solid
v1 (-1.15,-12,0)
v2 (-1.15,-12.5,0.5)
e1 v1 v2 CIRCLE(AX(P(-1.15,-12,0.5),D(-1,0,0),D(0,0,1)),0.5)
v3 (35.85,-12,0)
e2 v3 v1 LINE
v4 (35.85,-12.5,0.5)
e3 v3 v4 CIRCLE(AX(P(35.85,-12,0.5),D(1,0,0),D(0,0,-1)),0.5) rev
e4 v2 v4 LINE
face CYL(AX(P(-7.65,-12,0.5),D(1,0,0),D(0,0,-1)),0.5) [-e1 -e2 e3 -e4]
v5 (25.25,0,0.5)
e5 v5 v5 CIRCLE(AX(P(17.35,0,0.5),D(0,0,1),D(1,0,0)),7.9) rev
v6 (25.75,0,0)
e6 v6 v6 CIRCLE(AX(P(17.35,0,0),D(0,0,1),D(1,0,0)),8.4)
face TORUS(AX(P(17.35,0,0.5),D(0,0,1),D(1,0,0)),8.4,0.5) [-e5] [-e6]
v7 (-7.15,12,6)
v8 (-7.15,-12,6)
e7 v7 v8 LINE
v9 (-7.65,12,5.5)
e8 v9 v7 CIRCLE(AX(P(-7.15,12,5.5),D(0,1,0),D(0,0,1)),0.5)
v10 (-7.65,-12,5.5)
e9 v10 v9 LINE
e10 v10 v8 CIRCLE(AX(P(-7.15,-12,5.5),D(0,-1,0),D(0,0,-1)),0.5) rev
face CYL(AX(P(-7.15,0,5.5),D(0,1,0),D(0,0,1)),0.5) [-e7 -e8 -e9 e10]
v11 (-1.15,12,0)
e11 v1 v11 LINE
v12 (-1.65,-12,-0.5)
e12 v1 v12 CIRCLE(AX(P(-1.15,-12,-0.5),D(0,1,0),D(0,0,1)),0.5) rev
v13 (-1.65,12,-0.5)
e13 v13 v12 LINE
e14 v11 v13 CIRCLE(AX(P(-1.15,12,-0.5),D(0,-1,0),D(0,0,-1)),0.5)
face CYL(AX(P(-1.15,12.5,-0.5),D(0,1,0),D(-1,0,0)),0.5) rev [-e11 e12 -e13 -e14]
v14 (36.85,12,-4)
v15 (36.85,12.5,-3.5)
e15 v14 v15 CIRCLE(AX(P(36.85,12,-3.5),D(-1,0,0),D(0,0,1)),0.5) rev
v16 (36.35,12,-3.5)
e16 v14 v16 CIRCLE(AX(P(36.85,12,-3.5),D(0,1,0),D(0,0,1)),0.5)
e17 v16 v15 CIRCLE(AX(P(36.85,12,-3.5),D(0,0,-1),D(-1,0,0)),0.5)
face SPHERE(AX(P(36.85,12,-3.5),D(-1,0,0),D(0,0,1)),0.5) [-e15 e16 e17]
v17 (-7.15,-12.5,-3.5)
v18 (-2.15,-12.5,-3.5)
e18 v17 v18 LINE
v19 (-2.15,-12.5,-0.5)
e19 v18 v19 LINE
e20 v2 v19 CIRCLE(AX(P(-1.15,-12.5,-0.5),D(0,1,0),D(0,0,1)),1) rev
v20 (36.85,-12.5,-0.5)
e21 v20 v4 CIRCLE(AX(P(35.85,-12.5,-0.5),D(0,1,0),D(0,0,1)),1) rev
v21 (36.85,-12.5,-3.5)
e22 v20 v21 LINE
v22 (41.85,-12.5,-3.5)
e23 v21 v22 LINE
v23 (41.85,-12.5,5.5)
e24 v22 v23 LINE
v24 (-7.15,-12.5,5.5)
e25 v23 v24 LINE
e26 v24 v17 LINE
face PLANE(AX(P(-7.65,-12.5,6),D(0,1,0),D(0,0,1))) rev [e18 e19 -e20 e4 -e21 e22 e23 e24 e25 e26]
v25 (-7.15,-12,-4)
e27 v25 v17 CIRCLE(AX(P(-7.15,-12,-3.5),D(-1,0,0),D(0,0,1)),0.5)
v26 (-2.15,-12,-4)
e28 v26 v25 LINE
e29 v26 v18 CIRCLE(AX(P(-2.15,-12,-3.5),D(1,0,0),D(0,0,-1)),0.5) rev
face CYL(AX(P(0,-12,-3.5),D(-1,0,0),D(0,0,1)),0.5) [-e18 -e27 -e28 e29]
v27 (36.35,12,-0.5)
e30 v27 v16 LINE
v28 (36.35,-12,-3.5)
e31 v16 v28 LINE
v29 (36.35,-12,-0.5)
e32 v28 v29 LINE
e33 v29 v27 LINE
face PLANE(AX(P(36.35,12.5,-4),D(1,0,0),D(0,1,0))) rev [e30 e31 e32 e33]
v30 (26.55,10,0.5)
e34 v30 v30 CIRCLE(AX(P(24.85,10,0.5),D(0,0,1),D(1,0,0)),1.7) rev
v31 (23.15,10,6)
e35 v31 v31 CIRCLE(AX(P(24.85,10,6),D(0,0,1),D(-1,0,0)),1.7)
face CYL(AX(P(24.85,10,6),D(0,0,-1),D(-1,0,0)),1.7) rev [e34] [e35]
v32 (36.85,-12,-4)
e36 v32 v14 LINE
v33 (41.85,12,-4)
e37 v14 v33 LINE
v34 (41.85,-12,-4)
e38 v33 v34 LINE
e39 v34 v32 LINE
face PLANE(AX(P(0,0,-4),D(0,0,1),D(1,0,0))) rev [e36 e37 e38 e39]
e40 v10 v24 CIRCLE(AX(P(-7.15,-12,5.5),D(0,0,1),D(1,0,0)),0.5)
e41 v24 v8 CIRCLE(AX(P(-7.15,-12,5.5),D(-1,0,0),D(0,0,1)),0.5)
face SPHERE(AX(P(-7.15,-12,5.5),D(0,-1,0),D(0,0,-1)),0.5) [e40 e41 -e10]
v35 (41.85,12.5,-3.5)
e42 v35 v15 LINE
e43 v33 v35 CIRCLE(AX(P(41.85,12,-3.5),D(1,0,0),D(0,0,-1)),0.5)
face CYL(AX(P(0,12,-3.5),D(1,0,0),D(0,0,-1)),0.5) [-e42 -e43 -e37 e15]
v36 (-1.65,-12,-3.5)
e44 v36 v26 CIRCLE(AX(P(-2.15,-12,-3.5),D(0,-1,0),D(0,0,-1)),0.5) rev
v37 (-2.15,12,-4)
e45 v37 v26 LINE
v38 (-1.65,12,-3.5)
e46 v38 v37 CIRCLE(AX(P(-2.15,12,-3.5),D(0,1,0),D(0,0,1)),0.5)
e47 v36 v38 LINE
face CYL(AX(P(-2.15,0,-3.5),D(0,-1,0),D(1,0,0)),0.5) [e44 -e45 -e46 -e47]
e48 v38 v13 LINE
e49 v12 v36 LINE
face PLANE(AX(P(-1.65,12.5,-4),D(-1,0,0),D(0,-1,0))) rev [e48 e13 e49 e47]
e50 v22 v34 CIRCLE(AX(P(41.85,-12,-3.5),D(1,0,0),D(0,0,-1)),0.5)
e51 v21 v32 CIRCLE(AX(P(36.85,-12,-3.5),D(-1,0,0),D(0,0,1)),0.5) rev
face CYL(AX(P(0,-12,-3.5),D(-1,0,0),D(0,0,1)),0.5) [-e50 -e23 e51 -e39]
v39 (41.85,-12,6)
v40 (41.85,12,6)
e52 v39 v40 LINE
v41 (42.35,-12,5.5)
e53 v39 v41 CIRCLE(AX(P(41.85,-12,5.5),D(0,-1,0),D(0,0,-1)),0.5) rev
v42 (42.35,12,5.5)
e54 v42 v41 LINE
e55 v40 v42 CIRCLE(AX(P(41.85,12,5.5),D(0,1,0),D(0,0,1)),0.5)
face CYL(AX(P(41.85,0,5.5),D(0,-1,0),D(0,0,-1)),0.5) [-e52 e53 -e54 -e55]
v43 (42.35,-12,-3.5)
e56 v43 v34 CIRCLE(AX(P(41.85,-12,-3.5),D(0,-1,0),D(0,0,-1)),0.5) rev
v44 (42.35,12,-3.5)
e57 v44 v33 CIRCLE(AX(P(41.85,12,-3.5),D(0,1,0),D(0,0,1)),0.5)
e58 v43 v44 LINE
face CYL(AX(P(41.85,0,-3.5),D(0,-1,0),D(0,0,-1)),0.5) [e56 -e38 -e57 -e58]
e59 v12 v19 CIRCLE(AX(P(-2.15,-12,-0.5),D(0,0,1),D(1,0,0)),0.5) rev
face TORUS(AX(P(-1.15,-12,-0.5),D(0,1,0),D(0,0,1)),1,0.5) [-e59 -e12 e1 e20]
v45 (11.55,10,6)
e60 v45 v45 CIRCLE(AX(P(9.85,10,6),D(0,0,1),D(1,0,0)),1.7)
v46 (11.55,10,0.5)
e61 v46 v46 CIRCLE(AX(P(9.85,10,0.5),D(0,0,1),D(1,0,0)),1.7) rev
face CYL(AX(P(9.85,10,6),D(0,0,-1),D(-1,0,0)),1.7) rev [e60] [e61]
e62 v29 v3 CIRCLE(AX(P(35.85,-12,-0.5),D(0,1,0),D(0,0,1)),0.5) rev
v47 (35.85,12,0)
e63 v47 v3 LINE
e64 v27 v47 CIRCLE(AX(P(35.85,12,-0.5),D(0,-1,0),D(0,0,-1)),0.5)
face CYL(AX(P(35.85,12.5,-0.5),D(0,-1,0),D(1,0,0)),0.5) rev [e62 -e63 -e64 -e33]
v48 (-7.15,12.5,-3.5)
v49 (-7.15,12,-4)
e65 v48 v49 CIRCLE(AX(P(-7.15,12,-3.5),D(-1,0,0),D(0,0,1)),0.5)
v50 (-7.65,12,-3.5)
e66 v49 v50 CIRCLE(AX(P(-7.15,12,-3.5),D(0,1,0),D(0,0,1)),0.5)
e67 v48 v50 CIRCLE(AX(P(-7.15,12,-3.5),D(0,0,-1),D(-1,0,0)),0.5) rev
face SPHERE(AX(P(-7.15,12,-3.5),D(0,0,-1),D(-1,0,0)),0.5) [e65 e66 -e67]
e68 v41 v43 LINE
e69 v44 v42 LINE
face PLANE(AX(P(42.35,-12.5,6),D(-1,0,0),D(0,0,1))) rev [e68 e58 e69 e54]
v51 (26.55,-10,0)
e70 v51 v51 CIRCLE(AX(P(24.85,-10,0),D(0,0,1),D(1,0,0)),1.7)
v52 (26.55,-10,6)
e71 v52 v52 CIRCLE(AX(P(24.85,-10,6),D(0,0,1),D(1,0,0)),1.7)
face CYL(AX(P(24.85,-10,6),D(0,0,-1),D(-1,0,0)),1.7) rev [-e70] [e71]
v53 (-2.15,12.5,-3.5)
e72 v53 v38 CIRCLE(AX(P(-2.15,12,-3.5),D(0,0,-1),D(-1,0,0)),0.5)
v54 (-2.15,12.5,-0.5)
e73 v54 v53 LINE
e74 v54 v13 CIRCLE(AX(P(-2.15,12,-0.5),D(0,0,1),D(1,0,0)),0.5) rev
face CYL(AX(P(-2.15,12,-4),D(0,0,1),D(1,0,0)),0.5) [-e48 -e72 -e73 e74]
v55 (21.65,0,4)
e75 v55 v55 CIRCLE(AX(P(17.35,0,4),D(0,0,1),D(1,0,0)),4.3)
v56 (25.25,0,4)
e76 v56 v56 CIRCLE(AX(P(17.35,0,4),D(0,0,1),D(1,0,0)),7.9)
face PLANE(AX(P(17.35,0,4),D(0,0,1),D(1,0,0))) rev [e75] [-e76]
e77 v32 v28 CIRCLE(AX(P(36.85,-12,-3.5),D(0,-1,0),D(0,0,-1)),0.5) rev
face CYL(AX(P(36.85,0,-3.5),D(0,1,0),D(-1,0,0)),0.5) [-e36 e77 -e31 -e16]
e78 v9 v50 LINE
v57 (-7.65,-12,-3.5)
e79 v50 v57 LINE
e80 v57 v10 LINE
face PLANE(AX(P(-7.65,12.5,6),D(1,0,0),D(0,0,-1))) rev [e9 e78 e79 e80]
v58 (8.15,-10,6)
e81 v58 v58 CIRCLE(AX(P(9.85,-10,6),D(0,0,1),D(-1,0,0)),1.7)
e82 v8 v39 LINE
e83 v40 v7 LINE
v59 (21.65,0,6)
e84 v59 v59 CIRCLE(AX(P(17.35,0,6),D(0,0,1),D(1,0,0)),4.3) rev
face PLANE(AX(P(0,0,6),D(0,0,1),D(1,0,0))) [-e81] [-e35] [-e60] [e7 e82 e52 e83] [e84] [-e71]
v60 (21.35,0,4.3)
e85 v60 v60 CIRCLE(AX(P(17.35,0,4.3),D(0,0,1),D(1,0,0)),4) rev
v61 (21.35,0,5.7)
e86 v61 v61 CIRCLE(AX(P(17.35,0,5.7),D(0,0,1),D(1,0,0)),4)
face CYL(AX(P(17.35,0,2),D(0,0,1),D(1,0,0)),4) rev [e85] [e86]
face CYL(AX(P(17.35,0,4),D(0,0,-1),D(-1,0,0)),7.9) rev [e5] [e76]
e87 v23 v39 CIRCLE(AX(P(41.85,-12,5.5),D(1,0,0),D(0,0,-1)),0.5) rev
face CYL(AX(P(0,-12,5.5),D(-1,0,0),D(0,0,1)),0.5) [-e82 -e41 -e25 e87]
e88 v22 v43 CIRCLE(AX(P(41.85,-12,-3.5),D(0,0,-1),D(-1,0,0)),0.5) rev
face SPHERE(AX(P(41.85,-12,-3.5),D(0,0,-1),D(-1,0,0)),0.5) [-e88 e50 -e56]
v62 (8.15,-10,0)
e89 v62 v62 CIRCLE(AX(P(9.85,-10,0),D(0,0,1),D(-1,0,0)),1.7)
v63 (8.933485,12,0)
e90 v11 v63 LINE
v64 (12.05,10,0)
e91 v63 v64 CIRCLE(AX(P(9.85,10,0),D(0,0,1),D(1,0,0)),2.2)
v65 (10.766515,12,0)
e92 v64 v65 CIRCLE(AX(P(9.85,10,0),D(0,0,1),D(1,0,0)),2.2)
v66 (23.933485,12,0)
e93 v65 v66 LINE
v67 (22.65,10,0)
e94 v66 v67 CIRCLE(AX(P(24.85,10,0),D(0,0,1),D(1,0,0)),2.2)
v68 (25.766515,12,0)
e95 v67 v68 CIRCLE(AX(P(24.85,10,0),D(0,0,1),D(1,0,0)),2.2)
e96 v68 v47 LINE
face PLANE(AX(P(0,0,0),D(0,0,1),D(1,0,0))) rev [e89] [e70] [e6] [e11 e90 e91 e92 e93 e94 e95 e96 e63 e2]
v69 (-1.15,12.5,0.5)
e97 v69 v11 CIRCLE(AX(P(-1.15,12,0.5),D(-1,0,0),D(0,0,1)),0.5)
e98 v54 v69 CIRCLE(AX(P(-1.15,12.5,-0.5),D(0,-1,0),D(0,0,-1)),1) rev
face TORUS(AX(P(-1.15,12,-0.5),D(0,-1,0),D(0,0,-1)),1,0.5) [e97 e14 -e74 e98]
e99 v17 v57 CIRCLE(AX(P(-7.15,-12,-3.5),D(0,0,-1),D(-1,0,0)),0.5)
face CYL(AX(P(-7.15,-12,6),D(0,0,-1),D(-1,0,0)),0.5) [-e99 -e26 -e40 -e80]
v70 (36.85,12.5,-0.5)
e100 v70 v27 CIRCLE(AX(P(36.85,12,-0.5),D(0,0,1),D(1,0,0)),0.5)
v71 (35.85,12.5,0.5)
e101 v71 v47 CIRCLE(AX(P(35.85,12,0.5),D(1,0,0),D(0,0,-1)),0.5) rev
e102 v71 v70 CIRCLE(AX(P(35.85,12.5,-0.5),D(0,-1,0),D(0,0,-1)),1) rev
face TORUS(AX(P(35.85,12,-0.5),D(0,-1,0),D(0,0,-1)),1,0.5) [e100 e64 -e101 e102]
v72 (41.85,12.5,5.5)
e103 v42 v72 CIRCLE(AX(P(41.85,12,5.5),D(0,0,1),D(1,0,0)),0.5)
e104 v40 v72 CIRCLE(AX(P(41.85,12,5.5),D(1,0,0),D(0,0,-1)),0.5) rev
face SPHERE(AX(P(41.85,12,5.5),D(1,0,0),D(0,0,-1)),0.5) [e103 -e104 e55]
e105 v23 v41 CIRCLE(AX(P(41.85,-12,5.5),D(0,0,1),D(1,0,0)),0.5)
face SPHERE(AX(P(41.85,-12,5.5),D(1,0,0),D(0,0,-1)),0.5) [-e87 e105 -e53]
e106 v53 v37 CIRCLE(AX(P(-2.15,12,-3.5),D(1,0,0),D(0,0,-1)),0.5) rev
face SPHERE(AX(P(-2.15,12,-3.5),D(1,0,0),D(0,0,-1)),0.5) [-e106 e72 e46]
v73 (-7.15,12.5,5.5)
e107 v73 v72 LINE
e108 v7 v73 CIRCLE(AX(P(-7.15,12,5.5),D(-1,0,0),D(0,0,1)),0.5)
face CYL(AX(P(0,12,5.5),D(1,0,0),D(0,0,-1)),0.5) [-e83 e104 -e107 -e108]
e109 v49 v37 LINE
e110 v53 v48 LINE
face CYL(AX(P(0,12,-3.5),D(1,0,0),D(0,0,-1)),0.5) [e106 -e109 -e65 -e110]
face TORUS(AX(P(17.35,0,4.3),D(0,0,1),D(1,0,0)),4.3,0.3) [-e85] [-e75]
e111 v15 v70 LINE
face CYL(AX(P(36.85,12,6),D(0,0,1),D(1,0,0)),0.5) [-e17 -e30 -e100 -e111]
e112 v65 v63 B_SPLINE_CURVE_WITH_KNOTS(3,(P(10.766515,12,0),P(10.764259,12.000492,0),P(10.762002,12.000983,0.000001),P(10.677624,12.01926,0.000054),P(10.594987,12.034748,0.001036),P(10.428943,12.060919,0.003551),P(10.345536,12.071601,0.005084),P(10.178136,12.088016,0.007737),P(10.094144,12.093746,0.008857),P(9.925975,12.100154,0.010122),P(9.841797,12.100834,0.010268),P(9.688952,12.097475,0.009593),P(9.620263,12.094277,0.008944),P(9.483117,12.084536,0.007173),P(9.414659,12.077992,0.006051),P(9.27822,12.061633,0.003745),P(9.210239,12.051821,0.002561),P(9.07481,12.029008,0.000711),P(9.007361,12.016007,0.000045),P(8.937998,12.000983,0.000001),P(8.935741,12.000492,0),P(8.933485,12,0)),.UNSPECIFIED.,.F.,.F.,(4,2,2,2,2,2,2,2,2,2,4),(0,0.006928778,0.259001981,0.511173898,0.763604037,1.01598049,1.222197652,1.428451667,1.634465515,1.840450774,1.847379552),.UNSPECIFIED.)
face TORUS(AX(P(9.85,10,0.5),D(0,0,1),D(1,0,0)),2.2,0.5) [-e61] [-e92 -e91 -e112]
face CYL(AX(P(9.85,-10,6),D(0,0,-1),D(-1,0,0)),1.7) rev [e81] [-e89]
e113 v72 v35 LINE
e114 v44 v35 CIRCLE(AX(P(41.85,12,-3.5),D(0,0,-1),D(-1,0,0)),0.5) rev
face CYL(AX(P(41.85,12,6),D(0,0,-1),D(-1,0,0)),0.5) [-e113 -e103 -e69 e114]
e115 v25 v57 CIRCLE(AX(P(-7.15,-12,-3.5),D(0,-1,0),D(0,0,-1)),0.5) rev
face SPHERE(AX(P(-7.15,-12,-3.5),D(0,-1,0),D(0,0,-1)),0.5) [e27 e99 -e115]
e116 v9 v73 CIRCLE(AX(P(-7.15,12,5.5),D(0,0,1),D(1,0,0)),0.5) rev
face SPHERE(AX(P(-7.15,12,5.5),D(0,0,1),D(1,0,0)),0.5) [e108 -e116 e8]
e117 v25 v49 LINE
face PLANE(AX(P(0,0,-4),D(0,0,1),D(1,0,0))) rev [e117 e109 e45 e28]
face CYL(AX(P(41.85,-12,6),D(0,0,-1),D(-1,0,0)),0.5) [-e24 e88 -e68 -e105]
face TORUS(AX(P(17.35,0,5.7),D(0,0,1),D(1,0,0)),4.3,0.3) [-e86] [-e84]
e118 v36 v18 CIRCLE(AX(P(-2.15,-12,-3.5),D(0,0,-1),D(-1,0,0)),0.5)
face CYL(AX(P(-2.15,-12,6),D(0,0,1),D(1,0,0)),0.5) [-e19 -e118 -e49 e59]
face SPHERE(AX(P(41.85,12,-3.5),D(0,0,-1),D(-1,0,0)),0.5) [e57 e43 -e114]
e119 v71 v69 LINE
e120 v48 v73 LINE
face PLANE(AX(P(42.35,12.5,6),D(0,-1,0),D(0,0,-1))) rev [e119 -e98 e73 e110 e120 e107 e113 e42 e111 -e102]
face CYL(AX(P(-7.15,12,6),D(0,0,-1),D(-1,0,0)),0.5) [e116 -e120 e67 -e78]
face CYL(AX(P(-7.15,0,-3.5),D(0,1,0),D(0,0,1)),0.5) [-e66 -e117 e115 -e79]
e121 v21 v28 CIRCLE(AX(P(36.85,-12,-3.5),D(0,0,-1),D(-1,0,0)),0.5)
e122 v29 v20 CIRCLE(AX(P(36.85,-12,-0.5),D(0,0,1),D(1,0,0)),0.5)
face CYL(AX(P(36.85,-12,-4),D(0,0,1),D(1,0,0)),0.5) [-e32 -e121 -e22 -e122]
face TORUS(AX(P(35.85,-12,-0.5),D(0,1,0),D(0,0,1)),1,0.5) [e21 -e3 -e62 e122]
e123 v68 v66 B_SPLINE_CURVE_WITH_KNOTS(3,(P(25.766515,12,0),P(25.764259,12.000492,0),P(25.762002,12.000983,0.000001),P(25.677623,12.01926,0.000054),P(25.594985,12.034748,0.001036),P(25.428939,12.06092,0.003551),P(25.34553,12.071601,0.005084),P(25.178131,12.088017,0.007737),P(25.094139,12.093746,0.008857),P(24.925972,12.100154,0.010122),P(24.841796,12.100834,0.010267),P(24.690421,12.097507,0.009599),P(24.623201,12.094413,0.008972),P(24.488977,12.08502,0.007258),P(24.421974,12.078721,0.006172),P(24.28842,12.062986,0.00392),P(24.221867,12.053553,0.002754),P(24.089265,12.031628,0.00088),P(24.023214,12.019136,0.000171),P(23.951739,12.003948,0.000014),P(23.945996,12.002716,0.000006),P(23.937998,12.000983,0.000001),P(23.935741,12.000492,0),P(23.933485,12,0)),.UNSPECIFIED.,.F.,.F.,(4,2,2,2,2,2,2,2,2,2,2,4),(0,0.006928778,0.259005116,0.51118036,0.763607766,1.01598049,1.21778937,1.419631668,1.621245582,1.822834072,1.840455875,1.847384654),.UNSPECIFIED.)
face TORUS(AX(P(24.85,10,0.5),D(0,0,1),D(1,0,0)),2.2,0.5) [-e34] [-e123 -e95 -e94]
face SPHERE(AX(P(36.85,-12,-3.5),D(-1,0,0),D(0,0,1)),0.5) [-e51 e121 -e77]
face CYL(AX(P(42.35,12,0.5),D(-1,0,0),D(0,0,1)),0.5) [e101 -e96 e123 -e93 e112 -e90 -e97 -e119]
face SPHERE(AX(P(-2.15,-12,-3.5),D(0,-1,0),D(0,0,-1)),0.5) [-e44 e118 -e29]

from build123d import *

# Parameters (mm, degrees)
SKETCH1_W               = 50
SKETCH1_H               = 25
SKETCH1_R               = 1.7
BOSS_EXTRUDE1_DEPTH     = 6
SKETCH2_R               = 4
CUT_EXTRUDE1_DEPTH      = 4
CUT_EXTRUDE2_DEPTH      = 2
CUT_EXTRUDE2_DEPTH_BACK = 45.337033054
SKETCH3_R               = 7.9
SKETCH5_W               = 6
SKETCH5_H               = 25
BOSS_EXTRUDE3_DEPTH     = 4
FILLET1_R               = 0.5
FILLET2_R               = 0.5
FILLET3_R               = 0.3


with BuildPart() as part:
    # Sketch1 → Boss-Extrude1 (new body)
    with BuildSketch(Plane.XY):
        with Locations((17.35, 0)):
            Rectangle(SKETCH1_W, SKETCH1_H)
        with Locations((9.85, 10)):
            Circle(SKETCH1_R, mode=Mode.SUBTRACT)
        with Locations(Location((24.85, 10, 0), (0, 0, 180))):
            Circle(SKETCH1_R, mode=Mode.SUBTRACT)
        with Locations((24.85, -10)):
            Circle(SKETCH1_R, mode=Mode.SUBTRACT)
        with Locations(Location((9.85, -10, 0), (0, 0, 180))):
            Circle(SKETCH1_R, mode=Mode.SUBTRACT)
    extrude(amount=BOSS_EXTRUDE1_DEPTH)

    # Sketch2 → Cut-Extrude1 (cut)
    with BuildSketch(Plane.XY.offset(6)):
        with Locations((17.35, 0)):
            Circle(SKETCH2_R)
    extrude(amount=-CUT_EXTRUDE1_DEPTH, mode=Mode.SUBTRACT)

    # Sketch3 → Cut-Extrude2 (cut, two sides: drawn at the far end of the back side and taken through both)
    with BuildSketch(Plane.XY.offset(2).offset(-CUT_EXTRUDE2_DEPTH_BACK)):
        with Locations((17.35, 0)):
            Circle(SKETCH3_R)
    extrude(amount=CUT_EXTRUDE2_DEPTH + CUT_EXTRUDE2_DEPTH_BACK, mode=Mode.SUBTRACT)

    # Sketch5 → Boss-Extrude3 (add)
    with BuildSketch(Plane(origin=(0, 0, 0), x_dir=(-1, 0, 0), z_dir=(0, 0, -1))):
        with Locations((4.65, 0)):
            Rectangle(SKETCH5_W, SKETCH5_H)
        with Locations((-39.35, 0)):
            Rectangle(SKETCH5_W, SKETCH5_H)
    extrude(amount=BOSS_EXTRUDE3_DEPTH)

    # Fillet1
    # the kernel refuses this fillet: 0.5 mm, written as the material it adds along each edge
    with BuildSketch(Plane(origin=(-1.65, 12.5, 0), x_dir=(0, 0, -1), z_dir=(0, -1, 0)), Plane(origin=(36.35, 12.5, 0), x_dir=(-1, 0, 0), z_dir=(0, -1, 0))) as fillet1_piece_1:
        with BuildLine():
            CenterArc((FILLET1_R, FILLET1_R), FILLET1_R, 180, 90)
            Line((0, FILLET1_R), (0, 0))
            Line((0, 0), (FILLET1_R, 0))
        make_face()
    extrude(amount=25)
    # the kernel refuses this fillet: 0.5 mm, written as the material it takes off along each edge
    with BuildSketch(Plane(origin=(-7.15, -12, 5.5), x_dir=(0, 0, 1), z_dir=(-1, 0, 0))) as fillet1_2_piece_1_section:
        Polygon((0, 0), (FILLET1_R, 0), (FILLET1_R, -FILLET1_R), (0, -FILLET1_R), align=None)
    fillet1_2_piece_1 = extrude(amount=FILLET1_R, mode=Mode.PRIVATE)
    fillet1_2_piece_1 = fillet1_2_piece_1 - Plane(origin=(-7.15, -12, 5.5), x_dir=(0, 0.7071067811865475, -0.7071067811865475), z_dir=(-1, 0, 0)) * Sphere(FILLET1_R, mode=Mode.PRIVATE)
    add(fillet1_2_piece_1, mode=Mode.SUBTRACT)
    with BuildSketch(Plane(origin=(41.85, -12, 5.5), x_dir=(0, -1, 0), z_dir=(0, 0, 1))) as fillet1_2_piece_2_section:
        Polygon((0, 0), (FILLET1_R, 0), (FILLET1_R, FILLET1_R), (0, FILLET1_R), align=None)
    fillet1_2_piece_2 = extrude(amount=FILLET1_R, mode=Mode.PRIVATE)
    fillet1_2_piece_2 = fillet1_2_piece_2 - Plane(origin=(41.85, -12, 5.5), x_dir=(-0.7071067811865475, 0.7071067811865475, 0), z_dir=(0, 0, 1)) * Sphere(FILLET1_R, mode=Mode.PRIVATE)
    add(fillet1_2_piece_2, mode=Mode.SUBTRACT)
    with BuildSketch(Plane(origin=(41.85, 12, 5.5), x_dir=(0, 0, 1), z_dir=(0, 1, 0))) as fillet1_2_piece_3_section:
        Polygon((0, 0), (FILLET1_R, 0), (FILLET1_R, FILLET1_R), (0, FILLET1_R), align=None)
    fillet1_2_piece_3 = extrude(amount=FILLET1_R, mode=Mode.PRIVATE)
    fillet1_2_piece_3 = fillet1_2_piece_3 - Plane(origin=(41.85, 12, 5.5), x_dir=(-0.7071067811865475, 0, -0.7071067811865475), z_dir=(0, 1, 0)) * Sphere(FILLET1_R, mode=Mode.PRIVATE)
    add(fillet1_2_piece_3, mode=Mode.SUBTRACT)
    with BuildSketch(Plane(origin=(-7.15, -12, -3.5), x_dir=(0, -1, 0), z_dir=(-1, 0, 0))) as fillet1_2_piece_4_section:
        Polygon((0, 0), (FILLET1_R, 0), (FILLET1_R, -FILLET1_R), (0, -FILLET1_R), align=None)
    fillet1_2_piece_4 = extrude(amount=FILLET1_R, mode=Mode.PRIVATE)
    fillet1_2_piece_4 = fillet1_2_piece_4 - Plane(origin=(-7.15, -12, -3.5), x_dir=(0, 0.7071067811865475, 0.7071067811865475), z_dir=(-1, 0, 0)) * Sphere(FILLET1_R, mode=Mode.PRIVATE)
    add(fillet1_2_piece_4, mode=Mode.SUBTRACT)
    with BuildSketch(Plane(origin=(-7.15, 12, -3.5), x_dir=(0, 1, 0), z_dir=(-1, 0, 0))) as fillet1_2_piece_5_section:
        Polygon((0, 0), (FILLET1_R, 0), (FILLET1_R, FILLET1_R), (0, FILLET1_R), align=None)
    fillet1_2_piece_5 = extrude(amount=FILLET1_R, mode=Mode.PRIVATE)
    fillet1_2_piece_5 = fillet1_2_piece_5 - Plane(origin=(-7.15, 12, -3.5), x_dir=(0, -0.7071067811865475, 0.7071067811865475), z_dir=(-1, 0, 0)) * Sphere(FILLET1_R, mode=Mode.PRIVATE)
    add(fillet1_2_piece_5, mode=Mode.SUBTRACT)
    with BuildSketch(Plane(origin=(-7.15, 12, 5.5), x_dir=(0, 1, 0), z_dir=(-1, 0, 0))) as fillet1_2_piece_6_section:
        Polygon((0, 0), (FILLET1_R, 0), (FILLET1_R, -FILLET1_R), (0, -FILLET1_R), align=None)
    fillet1_2_piece_6 = extrude(amount=FILLET1_R, mode=Mode.PRIVATE)
    fillet1_2_piece_6 = fillet1_2_piece_6 - Plane(origin=(-7.15, 12, 5.5), x_dir=(0, -0.7071067811865475, -0.7071067811865475), z_dir=(-1, 0, 0)) * Sphere(FILLET1_R, mode=Mode.PRIVATE)
    add(fillet1_2_piece_6, mode=Mode.SUBTRACT)
    with BuildSketch(Plane(origin=(41.85, 12, -3.5), x_dir=(1, 0, 0), z_dir=(0, 1, 0))) as fillet1_2_piece_7_section:
        Polygon((0, 0), (FILLET1_R, 0), (FILLET1_R, FILLET1_R), (0, FILLET1_R), align=None)
    fillet1_2_piece_7 = extrude(amount=FILLET1_R, mode=Mode.PRIVATE)
    fillet1_2_piece_7 = fillet1_2_piece_7 - Plane(origin=(41.85, 12, -3.5), x_dir=(-0.7071067811865475, 0, 0.7071067811865475), z_dir=(0, 1, 0)) * Sphere(FILLET1_R, mode=Mode.PRIVATE)
    add(fillet1_2_piece_7, mode=Mode.SUBTRACT)
    with BuildSketch(Plane(origin=(41.85, -12, -3.5), x_dir=(0, -1, 0), z_dir=(0, 0, -1))) as fillet1_2_piece_8_section:
        Polygon((0, 0), (FILLET1_R, 0), (FILLET1_R, -FILLET1_R), (0, -FILLET1_R), align=None)
    fillet1_2_piece_8 = extrude(amount=FILLET1_R, mode=Mode.PRIVATE)
    fillet1_2_piece_8 = fillet1_2_piece_8 - Plane(origin=(41.85, -12, -3.5), x_dir=(-0.7071067811865475, 0.7071067811865475, 0), z_dir=(0, 0, -1)) * Sphere(FILLET1_R, mode=Mode.PRIVATE)
    add(fillet1_2_piece_8, mode=Mode.SUBTRACT)
    with BuildSketch(Plane(origin=(9.85, 10, 0), x_dir=(1, 0, 0), z_dir=(0, -1, 0))) as fillet1_2_piece_9:
        with BuildLine():
            CenterArc((1.7 + FILLET1_R, FILLET1_R), FILLET1_R, 180, 90)
            Line((1.7, FILLET1_R), (1.7, 0))
            Line((1.7, 0), (1.7 + FILLET1_R, 0))
        make_face()
    revolve(axis=Axis((9.85, 10, 0), (0, 0, 1)), mode=Mode.SUBTRACT)
    with BuildSketch(Plane(origin=(-7.15, -12.5, 6), x_dir=(0, 1, 0), z_dir=(1, 0, 0))) as fillet1_2_piece_10:
        with BuildLine():
            CenterArc((FILLET1_R, -FILLET1_R), FILLET1_R, 90, 90)
            Line((0, -FILLET1_R), (0, 0))
            Line((0, 0), (FILLET1_R, 0))
        make_face()
    extrude(amount=49, mode=Mode.SUBTRACT)
    with BuildSketch(Plane(origin=(24.85, 10, 0), x_dir=(-1, 0, 0), z_dir=(0, 1, 0))) as fillet1_2_piece_11:
        with BuildLine():
            CenterArc((1.7 + FILLET1_R, FILLET1_R), FILLET1_R, 180, 90)
            Line((1.7, FILLET1_R), (1.7, 0))
            Line((1.7, 0), (1.7 + FILLET1_R, 0))
        make_face()
    revolve(axis=Axis((24.85, 10, 0), (0, 0, 1)), mode=Mode.SUBTRACT)
    with BuildSketch(Plane(origin=(42.35, -12, 6), x_dir=(-1, 0, 0), z_dir=(0, 1, 0)), Plane(origin=(42.35, -12, -4), x_dir=(0, 0, 1), z_dir=(0, 1, 0))) as fillet1_2_piece_12:
        with BuildLine():
            CenterArc((FILLET1_R, -FILLET1_R), FILLET1_R, 90, 90)
            Line((0, -FILLET1_R), (0, 0))
            Line((0, 0), (FILLET1_R, 0))
        make_face()
    extrude(amount=24, mode=Mode.SUBTRACT)
    with BuildSketch(Plane(origin=(-7.65, -12, -4), x_dir=(0, 0, 1), z_dir=(0, 1, 0)), Plane(origin=(-7.65, 12, 6), x_dir=(0, 0, -1), z_dir=(0, -1, 0))) as fillet1_2_piece_13:
        with BuildLine():
            CenterArc((FILLET1_R, FILLET1_R), FILLET1_R, 180, 90)
            Line((0, FILLET1_R), (0, 0))
            Line((0, 0), (FILLET1_R, 0))
        make_face()
    extrude(amount=24, mode=Mode.SUBTRACT)
    with BuildSketch(Plane(origin=(-7.15, 12.5, -4), x_dir=(0, 0, 1), z_dir=(1, 0, 0)), Plane(origin=(-0.4, -12.5, -4), x_dir=(0, 0, 1), z_dir=(-1, 0, 0))) as fillet1_2_piece_14:
        with BuildLine():
            CenterArc((FILLET1_R, FILLET1_R), FILLET1_R, 180, 90)
            Line((0, FILLET1_R), (0, 0))
            Line((0, 0), (FILLET1_R, 0))
        make_face()
    extrude(amount=6.75, mode=Mode.SUBTRACT)
    with BuildSketch(Plane(origin=(-1.65, 13.75, -4), x_dir=(-1, 0, 0), z_dir=(0, -1, 0)), Plane(origin=(36.35, 13.75, -4), x_dir=(0, 0, 1), z_dir=(0, -1, 0))) as fillet1_2_piece_15:
        with BuildLine():
            CenterArc((FILLET1_R, -FILLET1_R), FILLET1_R, 90, 90)
            Line((0, -FILLET1_R), (0, 0))
            Line((0, 0), (FILLET1_R, 0))
        make_face()
    extrude(amount=27.5, mode=Mode.SUBTRACT)
    with BuildSketch(Plane(origin=(41.85, 12.5, 6), x_dir=(0, 0, -1), z_dir=(-1, 0, 0))) as fillet1_2_piece_16:
        with BuildLine():
            CenterArc((FILLET1_R, FILLET1_R), FILLET1_R, 180, 90)
            Line((0, FILLET1_R), (0, 0))
            Line((0, 0), (FILLET1_R, 0))
        make_face()
    extrude(amount=49, mode=Mode.SUBTRACT)
    with BuildSketch(Plane(origin=(41.85, 12.5, -4), x_dir=(0, 0, 1), z_dir=(-1, 0, 0)), Plane(origin=(35.1, -12.5, -4), x_dir=(0, 0, 1), z_dir=(1, 0, 0))) as fillet1_2_piece_17:
        with BuildLine():
            CenterArc((FILLET1_R, -FILLET1_R), FILLET1_R, 90, 90)
            Line((0, -FILLET1_R), (0, 0))
            Line((0, 0), (FILLET1_R, 0))
        make_face()
    extrude(amount=6.75, mode=Mode.SUBTRACT)
    with BuildSketch(Plane(origin=(42.35, 12.5, 5.5), x_dir=(-1, 0, 0), z_dir=(0, 0, -1)), Plane(origin=(42.35, -12.5, -3.5), x_dir=(-1, 0, 0), z_dir=(0, 0, 1)), Plane(origin=(-7.65, -12.5, -3.5), x_dir=(0, 1, 0), z_dir=(0, 0, 1)), Plane(origin=(-7.65, 12.5, 5.5), x_dir=(0, -1, 0), z_dir=(0, 0, -1))) as fillet1_2_piece_18:
        with BuildLine():
            CenterArc((FILLET1_R, -FILLET1_R), FILLET1_R, 90, 90)
            Line((0, -FILLET1_R), (0, 0))
            Line((0, 0), (FILLET1_R, 0))
        make_face()
    extrude(amount=9, mode=Mode.SUBTRACT)
    # the kernel refuses this fillet: 0.5 mm, written as the material it takes off along each edge
    with BuildSketch(Plane(origin=(36.85, -12, -3.5), x_dir=(-1, 0, 0), z_dir=(0, -1, 0))) as fillet1_3_piece_1_section:
        Polygon((0, 0), (FILLET1_R, 0), (FILLET1_R, FILLET1_R), (0, FILLET1_R), align=None)
    fillet1_3_piece_1 = extrude(amount=FILLET1_R, mode=Mode.PRIVATE)
    fillet1_3_piece_1 = fillet1_3_piece_1 - Plane(origin=(36.85, -12, -3.5), x_dir=(0.7071067811865475, 0, 0.7071067811865475), z_dir=(0, -1, 0)) * Sphere(FILLET1_R, mode=Mode.PRIVATE)
    add(fillet1_3_piece_1, mode=Mode.SUBTRACT)
    with BuildSketch(Plane(origin=(36.85, 12, -3.5), x_dir=(-1, 0, 0), z_dir=(0, 1, 0))) as fillet1_3_piece_2_section:
        Polygon((0, 0), (FILLET1_R, 0), (FILLET1_R, -FILLET1_R), (0, -FILLET1_R), align=None)
    fillet1_3_piece_2 = extrude(amount=FILLET1_R, mode=Mode.PRIVATE)
    fillet1_3_piece_2 = fillet1_3_piece_2 - Plane(origin=(36.85, 12, -3.5), x_dir=(0.7071067811865475, 0, 0.7071067811865475), z_dir=(0, 1, 0)) * Sphere(FILLET1_R, mode=Mode.PRIVATE)
    add(fillet1_3_piece_2, mode=Mode.SUBTRACT)
    with BuildSketch(Plane(origin=(-2.15, -12, -3.5), x_dir=(1, 0, 0), z_dir=(0, -1, 0))) as fillet1_3_piece_3_section:
        Polygon((0, 0), (FILLET1_R, 0), (FILLET1_R, -FILLET1_R), (0, -FILLET1_R), align=None)
    fillet1_3_piece_3 = extrude(amount=FILLET1_R, mode=Mode.PRIVATE)
    fillet1_3_piece_3 = fillet1_3_piece_3 - Plane(origin=(-2.15, -12, -3.5), x_dir=(-0.7071067811865475, 0, 0.7071067811865475), z_dir=(0, -1, 0)) * Sphere(FILLET1_R, mode=Mode.PRIVATE)
    add(fillet1_3_piece_3, mode=Mode.SUBTRACT)
    with BuildSketch(Plane(origin=(-2.15, 12, -3.5), x_dir=(1, 0, 0), z_dir=(0, 1, 0))) as fillet1_3_piece_4_section:
        Polygon((0, 0), (FILLET1_R, 0), (FILLET1_R, FILLET1_R), (0, FILLET1_R), align=None)
    fillet1_3_piece_4 = extrude(amount=FILLET1_R, mode=Mode.PRIVATE)
    fillet1_3_piece_4 = fillet1_3_piece_4 - Plane(origin=(-2.15, 12, -3.5), x_dir=(-0.7071067811865475, 0, 0.7071067811865475), z_dir=(0, 1, 0)) * Sphere(FILLET1_R, mode=Mode.PRIVATE)
    add(fillet1_3_piece_4, mode=Mode.SUBTRACT)
    with BuildSketch(Plane(origin=(-1.15, -12.5, 0), x_dir=(0, 0, 1), z_dir=(1, 0, 0)), Plane(origin=(35.85, 12.5, 0), x_dir=(0, 0, 1), z_dir=(-1, 0, 0))) as fillet1_3_piece_5:
        with BuildLine():
            CenterArc((FILLET1_R, -FILLET1_R), FILLET1_R, 90, 90)
            Line((0, -FILLET1_R), (0, 0))
            Line((0, 0), (FILLET1_R, 0))
        make_face()
    extrude(amount=37, mode=Mode.SUBTRACT)
    with BuildSketch(Plane(origin=(-1.65, 12.5, -0.5), x_dir=(-1, 0, 0), z_dir=(0, 0, -1)), Plane(origin=(36.35, -12.5, -0.5), x_dir=(1, 0, 0), z_dir=(0, 0, -1))) as fillet1_3_piece_6:
        with BuildLine():
            CenterArc((FILLET1_R, -FILLET1_R), FILLET1_R, 90, 90)
            Line((0, -FILLET1_R), (0, 0))
            Line((0, 0), (FILLET1_R, 0))
        make_face()
    extrude(amount=3, mode=Mode.SUBTRACT)
    with BuildSketch(Plane(origin=(-1.65, -12.5, -0.5), x_dir=(-1, 0, 0), z_dir=(0, 0, -1)), Plane(origin=(36.35, 12.5, -0.5), x_dir=(1, 0, 0), z_dir=(0, 0, -1))) as fillet1_3_piece_7:
        with BuildLine():
            CenterArc((FILLET1_R, FILLET1_R), FILLET1_R, 180, 90)
            Line((0, FILLET1_R), (0, 0))
            Line((0, 0), (FILLET1_R, 0))
        make_face()
    extrude(amount=3, mode=Mode.SUBTRACT)
    with BuildSketch(Plane(origin=(35.85, -12.5, -0.5), x_dir=(0, 0, 1), z_dir=(-1, 0, 0))) as fillet1_3_piece_8:
        with BuildLine():
            CenterArc((0.5 + FILLET1_R, FILLET1_R), FILLET1_R, 180, 90)
            Line((0.5, FILLET1_R), (0.5, 0))
            Line((0.5, 0), (0.5 + FILLET1_R, 0))
        make_face()
    revolve(axis=Axis((35.85, -12.5, -0.5), (0, 1, 0)), revolution_arc=90, mode=Mode.SUBTRACT)
    with BuildSketch(Plane(origin=(35.85, 12.5, -0.5), x_dir=(0, 0, 1), z_dir=(-1, 0, 0))) as fillet1_3_piece_9:
        with BuildLine():
            CenterArc((0.5 + FILLET1_R, -FILLET1_R), FILLET1_R, 90, 90)
            Line((0.5, -FILLET1_R), (0.5, 0))
            Line((0.5, 0), (0.5 + FILLET1_R, 0))
        make_face()
    revolve(axis=Axis((35.85, 12.5, -0.5), (0, 1, 0)), revolution_arc=90, mode=Mode.SUBTRACT)
    with BuildSketch(Plane(origin=(-1.15, 12.5, -0.5), x_dir=(-1, 0, 0), z_dir=(0, 0, -1))) as fillet1_3_piece_10:
        with BuildLine():
            CenterArc((0.5 + FILLET1_R, -FILLET1_R), FILLET1_R, 90, 90)
            Line((0.5, -FILLET1_R), (0.5, 0))
            Line((0.5, 0), (0.5 + FILLET1_R, 0))
        make_face()
    revolve(axis=Axis((-1.15, 12.5, -0.5), (0, 1, 0)), revolution_arc=90, mode=Mode.SUBTRACT)
    with BuildSketch(Plane(origin=(-1.15, -12.5, -0.5), x_dir=(-1, 0, 0), z_dir=(0, 0, -1))) as fillet1_3_piece_11:
        with BuildLine():
            CenterArc((0.5 + FILLET1_R, FILLET1_R), FILLET1_R, 180, 90)
            Line((0.5, FILLET1_R), (0.5, 0))
            Line((0.5, 0), (0.5 + FILLET1_R, 0))
        make_face()
    revolve(axis=Axis((-1.15, -12.5, -0.5), (0, 1, 0)), revolution_arc=90, mode=Mode.SUBTRACT)

    # Fillet2
    fillet2_edges = [part.edges().sort_by_distance(p)[0] for p in [
        (9.45, 0, 0),
    ]]
    fillet(fillet2_edges, radius=FILLET2_R)

    # Fillet3
    fillet3_edges = [part.edges().sort_by_distance(p)[0] for p in [
        (13.35, 0, 6),
        (13.35, 0, 4),
    ]]
    fillet(fillet3_edges, radius=FILLET3_R)


solid = part.part
